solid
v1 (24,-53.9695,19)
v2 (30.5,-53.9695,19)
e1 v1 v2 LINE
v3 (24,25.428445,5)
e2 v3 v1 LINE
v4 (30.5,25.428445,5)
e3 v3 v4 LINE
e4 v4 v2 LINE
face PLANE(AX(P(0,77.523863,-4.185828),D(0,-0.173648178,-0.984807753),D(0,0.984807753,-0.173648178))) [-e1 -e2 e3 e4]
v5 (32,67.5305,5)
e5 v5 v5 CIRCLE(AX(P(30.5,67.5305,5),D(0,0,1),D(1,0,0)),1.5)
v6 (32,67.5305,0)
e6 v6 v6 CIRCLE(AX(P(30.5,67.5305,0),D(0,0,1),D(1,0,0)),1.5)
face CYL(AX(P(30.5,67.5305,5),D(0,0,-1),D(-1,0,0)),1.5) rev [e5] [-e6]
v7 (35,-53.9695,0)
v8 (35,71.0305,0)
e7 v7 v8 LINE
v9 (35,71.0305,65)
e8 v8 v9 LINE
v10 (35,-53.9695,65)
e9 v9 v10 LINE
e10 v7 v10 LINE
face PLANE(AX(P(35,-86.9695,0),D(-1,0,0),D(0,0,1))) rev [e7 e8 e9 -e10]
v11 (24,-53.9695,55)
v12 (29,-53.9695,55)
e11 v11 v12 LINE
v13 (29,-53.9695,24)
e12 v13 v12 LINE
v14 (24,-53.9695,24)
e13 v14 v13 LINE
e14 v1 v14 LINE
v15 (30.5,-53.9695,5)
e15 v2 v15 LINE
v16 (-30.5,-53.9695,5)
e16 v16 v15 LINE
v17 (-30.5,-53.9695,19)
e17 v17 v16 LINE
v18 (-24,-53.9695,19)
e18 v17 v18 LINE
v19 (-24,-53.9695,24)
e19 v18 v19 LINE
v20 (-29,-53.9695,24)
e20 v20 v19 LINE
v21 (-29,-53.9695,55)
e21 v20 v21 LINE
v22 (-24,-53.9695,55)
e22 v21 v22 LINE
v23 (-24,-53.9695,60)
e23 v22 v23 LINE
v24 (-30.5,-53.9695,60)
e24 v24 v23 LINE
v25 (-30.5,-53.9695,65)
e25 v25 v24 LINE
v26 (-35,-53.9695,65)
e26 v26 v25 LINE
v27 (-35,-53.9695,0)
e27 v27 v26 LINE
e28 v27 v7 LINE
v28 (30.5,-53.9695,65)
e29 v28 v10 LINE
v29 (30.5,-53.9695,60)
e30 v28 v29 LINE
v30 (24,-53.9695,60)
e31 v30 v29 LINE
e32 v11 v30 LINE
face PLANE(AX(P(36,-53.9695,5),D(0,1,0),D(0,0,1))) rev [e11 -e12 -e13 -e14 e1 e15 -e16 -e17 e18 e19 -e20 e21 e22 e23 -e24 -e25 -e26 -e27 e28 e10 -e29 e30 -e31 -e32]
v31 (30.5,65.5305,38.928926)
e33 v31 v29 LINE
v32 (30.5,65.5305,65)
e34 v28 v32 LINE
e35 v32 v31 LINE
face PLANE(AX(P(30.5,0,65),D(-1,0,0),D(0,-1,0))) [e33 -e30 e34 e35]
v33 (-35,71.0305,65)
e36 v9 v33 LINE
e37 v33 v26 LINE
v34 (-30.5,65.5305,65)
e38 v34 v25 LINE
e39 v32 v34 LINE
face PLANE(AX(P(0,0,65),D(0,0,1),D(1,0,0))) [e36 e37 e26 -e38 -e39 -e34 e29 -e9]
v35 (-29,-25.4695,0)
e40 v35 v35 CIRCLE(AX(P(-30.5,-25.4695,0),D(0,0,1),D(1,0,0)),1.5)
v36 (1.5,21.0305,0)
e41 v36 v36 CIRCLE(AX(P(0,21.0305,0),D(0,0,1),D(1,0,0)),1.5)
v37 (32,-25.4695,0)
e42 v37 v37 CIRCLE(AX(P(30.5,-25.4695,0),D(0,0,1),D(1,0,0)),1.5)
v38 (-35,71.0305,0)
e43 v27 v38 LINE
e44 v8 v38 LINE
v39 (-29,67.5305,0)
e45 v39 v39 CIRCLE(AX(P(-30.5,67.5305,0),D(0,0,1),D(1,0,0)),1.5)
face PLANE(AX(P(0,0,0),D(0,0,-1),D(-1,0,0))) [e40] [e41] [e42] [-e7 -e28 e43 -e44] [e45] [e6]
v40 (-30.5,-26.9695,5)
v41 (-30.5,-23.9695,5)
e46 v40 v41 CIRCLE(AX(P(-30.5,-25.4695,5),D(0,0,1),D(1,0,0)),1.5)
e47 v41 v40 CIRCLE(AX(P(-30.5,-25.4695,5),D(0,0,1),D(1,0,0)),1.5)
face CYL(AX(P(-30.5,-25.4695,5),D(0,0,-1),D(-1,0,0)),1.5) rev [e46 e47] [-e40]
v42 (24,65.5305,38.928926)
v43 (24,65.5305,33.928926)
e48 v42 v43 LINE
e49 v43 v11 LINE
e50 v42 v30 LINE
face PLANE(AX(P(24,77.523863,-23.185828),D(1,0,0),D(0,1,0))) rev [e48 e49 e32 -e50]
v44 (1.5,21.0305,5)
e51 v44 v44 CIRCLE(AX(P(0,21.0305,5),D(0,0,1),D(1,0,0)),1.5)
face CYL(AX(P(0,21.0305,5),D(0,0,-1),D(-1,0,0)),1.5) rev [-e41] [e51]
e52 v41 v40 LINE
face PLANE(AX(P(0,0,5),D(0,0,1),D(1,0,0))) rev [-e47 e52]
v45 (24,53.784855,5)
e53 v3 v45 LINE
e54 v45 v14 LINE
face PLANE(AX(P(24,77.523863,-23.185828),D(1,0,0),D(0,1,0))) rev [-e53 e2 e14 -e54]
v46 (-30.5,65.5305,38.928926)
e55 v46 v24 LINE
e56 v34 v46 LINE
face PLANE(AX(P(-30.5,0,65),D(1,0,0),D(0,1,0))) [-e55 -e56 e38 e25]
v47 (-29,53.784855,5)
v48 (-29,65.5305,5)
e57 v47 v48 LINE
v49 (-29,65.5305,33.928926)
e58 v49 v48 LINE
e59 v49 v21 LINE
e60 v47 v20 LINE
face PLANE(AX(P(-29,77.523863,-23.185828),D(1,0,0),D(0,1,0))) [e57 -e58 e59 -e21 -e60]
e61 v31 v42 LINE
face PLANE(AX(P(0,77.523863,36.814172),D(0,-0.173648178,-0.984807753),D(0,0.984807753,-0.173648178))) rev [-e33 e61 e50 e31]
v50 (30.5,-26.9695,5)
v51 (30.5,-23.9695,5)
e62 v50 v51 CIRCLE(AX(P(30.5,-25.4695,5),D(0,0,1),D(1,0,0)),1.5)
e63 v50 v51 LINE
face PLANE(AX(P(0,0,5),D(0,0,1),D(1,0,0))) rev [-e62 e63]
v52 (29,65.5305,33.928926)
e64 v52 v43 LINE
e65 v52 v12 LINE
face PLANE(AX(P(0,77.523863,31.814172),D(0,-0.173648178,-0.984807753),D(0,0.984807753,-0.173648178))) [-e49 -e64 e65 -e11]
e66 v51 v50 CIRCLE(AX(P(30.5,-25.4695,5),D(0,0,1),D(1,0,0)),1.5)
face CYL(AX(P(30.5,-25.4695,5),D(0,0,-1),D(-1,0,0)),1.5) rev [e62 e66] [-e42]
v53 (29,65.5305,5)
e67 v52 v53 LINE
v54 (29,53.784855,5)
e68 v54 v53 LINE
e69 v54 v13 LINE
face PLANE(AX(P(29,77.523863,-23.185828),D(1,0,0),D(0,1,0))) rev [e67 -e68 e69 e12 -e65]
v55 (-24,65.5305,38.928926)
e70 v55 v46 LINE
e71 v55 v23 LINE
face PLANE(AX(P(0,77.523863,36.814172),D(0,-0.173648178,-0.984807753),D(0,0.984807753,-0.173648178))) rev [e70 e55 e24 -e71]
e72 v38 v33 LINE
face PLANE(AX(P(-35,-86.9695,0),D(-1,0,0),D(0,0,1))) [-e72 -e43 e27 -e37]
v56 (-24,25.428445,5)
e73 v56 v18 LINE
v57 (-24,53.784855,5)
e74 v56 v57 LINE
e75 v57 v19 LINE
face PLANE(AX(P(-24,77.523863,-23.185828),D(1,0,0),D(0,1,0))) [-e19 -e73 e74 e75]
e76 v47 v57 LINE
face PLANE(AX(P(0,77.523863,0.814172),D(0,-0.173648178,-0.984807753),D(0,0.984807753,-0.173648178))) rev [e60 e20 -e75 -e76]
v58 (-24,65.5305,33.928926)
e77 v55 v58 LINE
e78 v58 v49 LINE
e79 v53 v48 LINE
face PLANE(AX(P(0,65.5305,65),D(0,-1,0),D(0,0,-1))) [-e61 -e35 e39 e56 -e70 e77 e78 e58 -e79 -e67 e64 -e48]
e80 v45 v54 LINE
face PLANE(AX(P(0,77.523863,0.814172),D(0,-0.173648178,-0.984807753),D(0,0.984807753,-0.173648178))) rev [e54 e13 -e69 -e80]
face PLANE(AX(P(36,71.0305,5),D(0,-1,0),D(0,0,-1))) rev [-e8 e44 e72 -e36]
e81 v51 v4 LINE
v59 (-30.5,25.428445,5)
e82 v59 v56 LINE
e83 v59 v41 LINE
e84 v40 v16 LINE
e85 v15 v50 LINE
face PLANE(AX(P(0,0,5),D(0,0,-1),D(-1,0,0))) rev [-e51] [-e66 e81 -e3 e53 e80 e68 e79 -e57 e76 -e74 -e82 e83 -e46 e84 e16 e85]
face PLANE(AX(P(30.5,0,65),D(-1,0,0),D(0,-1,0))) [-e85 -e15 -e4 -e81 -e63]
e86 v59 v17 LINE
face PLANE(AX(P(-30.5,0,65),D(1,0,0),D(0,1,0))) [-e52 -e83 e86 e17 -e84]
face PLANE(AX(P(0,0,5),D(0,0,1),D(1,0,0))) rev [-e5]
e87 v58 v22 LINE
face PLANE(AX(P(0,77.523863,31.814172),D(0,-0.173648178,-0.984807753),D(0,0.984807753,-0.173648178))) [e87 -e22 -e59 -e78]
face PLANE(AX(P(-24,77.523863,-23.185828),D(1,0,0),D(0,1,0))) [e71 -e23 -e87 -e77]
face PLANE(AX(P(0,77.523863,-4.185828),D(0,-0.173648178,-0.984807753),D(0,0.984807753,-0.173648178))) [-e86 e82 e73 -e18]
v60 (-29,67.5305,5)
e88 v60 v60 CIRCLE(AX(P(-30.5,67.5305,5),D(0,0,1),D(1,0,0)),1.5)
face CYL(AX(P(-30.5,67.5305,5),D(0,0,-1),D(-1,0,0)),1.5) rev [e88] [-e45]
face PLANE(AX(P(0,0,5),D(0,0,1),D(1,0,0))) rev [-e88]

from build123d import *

# Parameters (mm, degrees)
SKETCH1_W             = 72
SKETCH1_H             = 125
BOSS_EXTRUDE1_DEPTH   = 5
SKETCH2_R             = 1.5
CUT_EXTRUDE6_DEPTH    = 5
BOSS_EXTRUDE2_DEPTH   = 60
BOSS_EXTRUDE3_START   = -30.5
BOSS_EXTRUDE3_DEPTH   = 1.5
BOSS_EXTRUDE3_START_2 = 29
BOSS_EXTRUDE3_2_DEPTH = 1.5
BOSS_EXTRUDE3_START_3 = -29
BOSS_EXTRUDE3_3_DEPTH = 5
BOSS_EXTRUDE3_START_4 = 24
BOSS_EXTRUDE3_4_DEPTH = 5
SKETCH5_W             = 1
SKETCH5_H             = 65
SKETCH5_W_2           = 4
CUT_EXTRUDE7_DEPTH    = 158


# Read off the part's stored shape, not the designer's step: Boss-Extrude3
with BuildPart() as part:
    # Sketch1 → Boss-Extrude1 (new body)
    with BuildSketch(Plane(origin=(0, 0, 0), x_dir=(-1, 0, 0), z_dir=(0, 0, 1))):
        with Locations((0, -8.5305)):
            Rectangle(SKETCH1_W, SKETCH1_H)
    extrude(amount=BOSS_EXTRUDE1_DEPTH)

    # Sketch2 → Cut-Extrude6 (cut)
    with BuildSketch(Plane(origin=(0, 0, 0), x_dir=(-1, 0, 0), z_dir=(0, 0, 1))):
        with Locations(Location((30.5, -67.5305, 0), (0, 0, 180))):
            Circle(SKETCH2_R)
        with Locations(Location((-30.5, -67.5305, 0), (0, 0, 180))):
            Circle(SKETCH2_R)
        with Locations(Location((30.5, 25.4695, 0), (0, 0, 180))):
            Circle(SKETCH2_R)
        with Locations(Location((-30.5, 25.4695, 0), (0, 0, 180))):
            Circle(SKETCH2_R)
        with Locations(Location((0, -21.0305, 0), (0, 0, 180))):
            Circle(SKETCH2_R)
    extrude(amount=CUT_EXTRUDE6_DEPTH, mode=Mode.SUBTRACT)

    # Sketch3 → Boss-Extrude2 (add)
    with BuildSketch(Plane.XY.offset(5)):
        Polygon((-30.5, -53.9695), (-30.5, 65.5305), (30.5, 65.5305), (30.5, -53.9695), (36, -53.9695), (36, 71.0305), (-36, 71.0305), (-36, -53.9695), align=None)
    extrude(amount=BOSS_EXTRUDE2_DEPTH)

    # Boss-Extrude3 outline → Boss-Extrude3 (add)
    with BuildSketch(Plane.YZ.offset(BOSS_EXTRUDE3_START)):
        Polygon((-53.9695, 19), (25.428445475, 5), (65.5305, 5), (65.5305, 38.928925805), (-53.9695, 60), align=None)
    extrude(amount=BOSS_EXTRUDE3_DEPTH)

    # Boss-Extrude3 2 outline → Boss-Extrude3 2 (add)
    with BuildSketch(Plane.YZ.offset(BOSS_EXTRUDE3_START_2)):
        Polygon((-53.9695, 19), (25.428445475, 5), (65.5305, 5), (65.5305, 38.928925805), (-53.9695, 60), align=None)
    extrude(amount=BOSS_EXTRUDE3_2_DEPTH)

    # Boss-Extrude3 3 outline → Boss-Extrude3 3 (add)
    with BuildSketch(Plane.YZ.offset(BOSS_EXTRUDE3_START_3)):
        Polygon((-53.9695, 24), (-53.9695, 19), (25.428445475, 5), (53.784854573, 5), align=None)
        Polygon((-53.9695, 60), (-53.9695, 55), (65.5305, 33.928925805), (65.5305, 38.928925805), align=None)
    extrude(amount=BOSS_EXTRUDE3_3_DEPTH)

    # Boss-Extrude3 4 outline → Boss-Extrude3 4 (add)
    with BuildSketch(Plane.YZ.offset(BOSS_EXTRUDE3_START_4)):
        Polygon((-53.9695, 24), (-53.9695, 19), (25.428445475, 5), (53.784854573, 5), align=None)
        Polygon((-53.9695, 60), (-53.9695, 55), (65.5305, 33.928925805), (65.5305, 38.928925805), align=None)
    extrude(amount=BOSS_EXTRUDE3_4_DEPTH)

    # Sketch5 → Cut-Extrude7 (cut)
    with BuildSketch(Plane(origin=(0, 71.0305, 0), x_dir=(1, 0, 0), z_dir=(0, 1, 0))):
        with Locations((-35.5, -32.5)):
            Rectangle(SKETCH5_W, SKETCH5_H)
        with Locations((-38, -32.5)):
            Rectangle(SKETCH5_W_2, SKETCH5_H)
        with Locations((38, -32.5)):
            Rectangle(SKETCH5_W_2, SKETCH5_H)
        with Locations((35.5, -32.5)):
            Rectangle(SKETCH5_W, SKETCH5_H)
    extrude(amount=-CUT_EXTRUDE7_DEPTH, mode=Mode.SUBTRACT)


solid = part.part
